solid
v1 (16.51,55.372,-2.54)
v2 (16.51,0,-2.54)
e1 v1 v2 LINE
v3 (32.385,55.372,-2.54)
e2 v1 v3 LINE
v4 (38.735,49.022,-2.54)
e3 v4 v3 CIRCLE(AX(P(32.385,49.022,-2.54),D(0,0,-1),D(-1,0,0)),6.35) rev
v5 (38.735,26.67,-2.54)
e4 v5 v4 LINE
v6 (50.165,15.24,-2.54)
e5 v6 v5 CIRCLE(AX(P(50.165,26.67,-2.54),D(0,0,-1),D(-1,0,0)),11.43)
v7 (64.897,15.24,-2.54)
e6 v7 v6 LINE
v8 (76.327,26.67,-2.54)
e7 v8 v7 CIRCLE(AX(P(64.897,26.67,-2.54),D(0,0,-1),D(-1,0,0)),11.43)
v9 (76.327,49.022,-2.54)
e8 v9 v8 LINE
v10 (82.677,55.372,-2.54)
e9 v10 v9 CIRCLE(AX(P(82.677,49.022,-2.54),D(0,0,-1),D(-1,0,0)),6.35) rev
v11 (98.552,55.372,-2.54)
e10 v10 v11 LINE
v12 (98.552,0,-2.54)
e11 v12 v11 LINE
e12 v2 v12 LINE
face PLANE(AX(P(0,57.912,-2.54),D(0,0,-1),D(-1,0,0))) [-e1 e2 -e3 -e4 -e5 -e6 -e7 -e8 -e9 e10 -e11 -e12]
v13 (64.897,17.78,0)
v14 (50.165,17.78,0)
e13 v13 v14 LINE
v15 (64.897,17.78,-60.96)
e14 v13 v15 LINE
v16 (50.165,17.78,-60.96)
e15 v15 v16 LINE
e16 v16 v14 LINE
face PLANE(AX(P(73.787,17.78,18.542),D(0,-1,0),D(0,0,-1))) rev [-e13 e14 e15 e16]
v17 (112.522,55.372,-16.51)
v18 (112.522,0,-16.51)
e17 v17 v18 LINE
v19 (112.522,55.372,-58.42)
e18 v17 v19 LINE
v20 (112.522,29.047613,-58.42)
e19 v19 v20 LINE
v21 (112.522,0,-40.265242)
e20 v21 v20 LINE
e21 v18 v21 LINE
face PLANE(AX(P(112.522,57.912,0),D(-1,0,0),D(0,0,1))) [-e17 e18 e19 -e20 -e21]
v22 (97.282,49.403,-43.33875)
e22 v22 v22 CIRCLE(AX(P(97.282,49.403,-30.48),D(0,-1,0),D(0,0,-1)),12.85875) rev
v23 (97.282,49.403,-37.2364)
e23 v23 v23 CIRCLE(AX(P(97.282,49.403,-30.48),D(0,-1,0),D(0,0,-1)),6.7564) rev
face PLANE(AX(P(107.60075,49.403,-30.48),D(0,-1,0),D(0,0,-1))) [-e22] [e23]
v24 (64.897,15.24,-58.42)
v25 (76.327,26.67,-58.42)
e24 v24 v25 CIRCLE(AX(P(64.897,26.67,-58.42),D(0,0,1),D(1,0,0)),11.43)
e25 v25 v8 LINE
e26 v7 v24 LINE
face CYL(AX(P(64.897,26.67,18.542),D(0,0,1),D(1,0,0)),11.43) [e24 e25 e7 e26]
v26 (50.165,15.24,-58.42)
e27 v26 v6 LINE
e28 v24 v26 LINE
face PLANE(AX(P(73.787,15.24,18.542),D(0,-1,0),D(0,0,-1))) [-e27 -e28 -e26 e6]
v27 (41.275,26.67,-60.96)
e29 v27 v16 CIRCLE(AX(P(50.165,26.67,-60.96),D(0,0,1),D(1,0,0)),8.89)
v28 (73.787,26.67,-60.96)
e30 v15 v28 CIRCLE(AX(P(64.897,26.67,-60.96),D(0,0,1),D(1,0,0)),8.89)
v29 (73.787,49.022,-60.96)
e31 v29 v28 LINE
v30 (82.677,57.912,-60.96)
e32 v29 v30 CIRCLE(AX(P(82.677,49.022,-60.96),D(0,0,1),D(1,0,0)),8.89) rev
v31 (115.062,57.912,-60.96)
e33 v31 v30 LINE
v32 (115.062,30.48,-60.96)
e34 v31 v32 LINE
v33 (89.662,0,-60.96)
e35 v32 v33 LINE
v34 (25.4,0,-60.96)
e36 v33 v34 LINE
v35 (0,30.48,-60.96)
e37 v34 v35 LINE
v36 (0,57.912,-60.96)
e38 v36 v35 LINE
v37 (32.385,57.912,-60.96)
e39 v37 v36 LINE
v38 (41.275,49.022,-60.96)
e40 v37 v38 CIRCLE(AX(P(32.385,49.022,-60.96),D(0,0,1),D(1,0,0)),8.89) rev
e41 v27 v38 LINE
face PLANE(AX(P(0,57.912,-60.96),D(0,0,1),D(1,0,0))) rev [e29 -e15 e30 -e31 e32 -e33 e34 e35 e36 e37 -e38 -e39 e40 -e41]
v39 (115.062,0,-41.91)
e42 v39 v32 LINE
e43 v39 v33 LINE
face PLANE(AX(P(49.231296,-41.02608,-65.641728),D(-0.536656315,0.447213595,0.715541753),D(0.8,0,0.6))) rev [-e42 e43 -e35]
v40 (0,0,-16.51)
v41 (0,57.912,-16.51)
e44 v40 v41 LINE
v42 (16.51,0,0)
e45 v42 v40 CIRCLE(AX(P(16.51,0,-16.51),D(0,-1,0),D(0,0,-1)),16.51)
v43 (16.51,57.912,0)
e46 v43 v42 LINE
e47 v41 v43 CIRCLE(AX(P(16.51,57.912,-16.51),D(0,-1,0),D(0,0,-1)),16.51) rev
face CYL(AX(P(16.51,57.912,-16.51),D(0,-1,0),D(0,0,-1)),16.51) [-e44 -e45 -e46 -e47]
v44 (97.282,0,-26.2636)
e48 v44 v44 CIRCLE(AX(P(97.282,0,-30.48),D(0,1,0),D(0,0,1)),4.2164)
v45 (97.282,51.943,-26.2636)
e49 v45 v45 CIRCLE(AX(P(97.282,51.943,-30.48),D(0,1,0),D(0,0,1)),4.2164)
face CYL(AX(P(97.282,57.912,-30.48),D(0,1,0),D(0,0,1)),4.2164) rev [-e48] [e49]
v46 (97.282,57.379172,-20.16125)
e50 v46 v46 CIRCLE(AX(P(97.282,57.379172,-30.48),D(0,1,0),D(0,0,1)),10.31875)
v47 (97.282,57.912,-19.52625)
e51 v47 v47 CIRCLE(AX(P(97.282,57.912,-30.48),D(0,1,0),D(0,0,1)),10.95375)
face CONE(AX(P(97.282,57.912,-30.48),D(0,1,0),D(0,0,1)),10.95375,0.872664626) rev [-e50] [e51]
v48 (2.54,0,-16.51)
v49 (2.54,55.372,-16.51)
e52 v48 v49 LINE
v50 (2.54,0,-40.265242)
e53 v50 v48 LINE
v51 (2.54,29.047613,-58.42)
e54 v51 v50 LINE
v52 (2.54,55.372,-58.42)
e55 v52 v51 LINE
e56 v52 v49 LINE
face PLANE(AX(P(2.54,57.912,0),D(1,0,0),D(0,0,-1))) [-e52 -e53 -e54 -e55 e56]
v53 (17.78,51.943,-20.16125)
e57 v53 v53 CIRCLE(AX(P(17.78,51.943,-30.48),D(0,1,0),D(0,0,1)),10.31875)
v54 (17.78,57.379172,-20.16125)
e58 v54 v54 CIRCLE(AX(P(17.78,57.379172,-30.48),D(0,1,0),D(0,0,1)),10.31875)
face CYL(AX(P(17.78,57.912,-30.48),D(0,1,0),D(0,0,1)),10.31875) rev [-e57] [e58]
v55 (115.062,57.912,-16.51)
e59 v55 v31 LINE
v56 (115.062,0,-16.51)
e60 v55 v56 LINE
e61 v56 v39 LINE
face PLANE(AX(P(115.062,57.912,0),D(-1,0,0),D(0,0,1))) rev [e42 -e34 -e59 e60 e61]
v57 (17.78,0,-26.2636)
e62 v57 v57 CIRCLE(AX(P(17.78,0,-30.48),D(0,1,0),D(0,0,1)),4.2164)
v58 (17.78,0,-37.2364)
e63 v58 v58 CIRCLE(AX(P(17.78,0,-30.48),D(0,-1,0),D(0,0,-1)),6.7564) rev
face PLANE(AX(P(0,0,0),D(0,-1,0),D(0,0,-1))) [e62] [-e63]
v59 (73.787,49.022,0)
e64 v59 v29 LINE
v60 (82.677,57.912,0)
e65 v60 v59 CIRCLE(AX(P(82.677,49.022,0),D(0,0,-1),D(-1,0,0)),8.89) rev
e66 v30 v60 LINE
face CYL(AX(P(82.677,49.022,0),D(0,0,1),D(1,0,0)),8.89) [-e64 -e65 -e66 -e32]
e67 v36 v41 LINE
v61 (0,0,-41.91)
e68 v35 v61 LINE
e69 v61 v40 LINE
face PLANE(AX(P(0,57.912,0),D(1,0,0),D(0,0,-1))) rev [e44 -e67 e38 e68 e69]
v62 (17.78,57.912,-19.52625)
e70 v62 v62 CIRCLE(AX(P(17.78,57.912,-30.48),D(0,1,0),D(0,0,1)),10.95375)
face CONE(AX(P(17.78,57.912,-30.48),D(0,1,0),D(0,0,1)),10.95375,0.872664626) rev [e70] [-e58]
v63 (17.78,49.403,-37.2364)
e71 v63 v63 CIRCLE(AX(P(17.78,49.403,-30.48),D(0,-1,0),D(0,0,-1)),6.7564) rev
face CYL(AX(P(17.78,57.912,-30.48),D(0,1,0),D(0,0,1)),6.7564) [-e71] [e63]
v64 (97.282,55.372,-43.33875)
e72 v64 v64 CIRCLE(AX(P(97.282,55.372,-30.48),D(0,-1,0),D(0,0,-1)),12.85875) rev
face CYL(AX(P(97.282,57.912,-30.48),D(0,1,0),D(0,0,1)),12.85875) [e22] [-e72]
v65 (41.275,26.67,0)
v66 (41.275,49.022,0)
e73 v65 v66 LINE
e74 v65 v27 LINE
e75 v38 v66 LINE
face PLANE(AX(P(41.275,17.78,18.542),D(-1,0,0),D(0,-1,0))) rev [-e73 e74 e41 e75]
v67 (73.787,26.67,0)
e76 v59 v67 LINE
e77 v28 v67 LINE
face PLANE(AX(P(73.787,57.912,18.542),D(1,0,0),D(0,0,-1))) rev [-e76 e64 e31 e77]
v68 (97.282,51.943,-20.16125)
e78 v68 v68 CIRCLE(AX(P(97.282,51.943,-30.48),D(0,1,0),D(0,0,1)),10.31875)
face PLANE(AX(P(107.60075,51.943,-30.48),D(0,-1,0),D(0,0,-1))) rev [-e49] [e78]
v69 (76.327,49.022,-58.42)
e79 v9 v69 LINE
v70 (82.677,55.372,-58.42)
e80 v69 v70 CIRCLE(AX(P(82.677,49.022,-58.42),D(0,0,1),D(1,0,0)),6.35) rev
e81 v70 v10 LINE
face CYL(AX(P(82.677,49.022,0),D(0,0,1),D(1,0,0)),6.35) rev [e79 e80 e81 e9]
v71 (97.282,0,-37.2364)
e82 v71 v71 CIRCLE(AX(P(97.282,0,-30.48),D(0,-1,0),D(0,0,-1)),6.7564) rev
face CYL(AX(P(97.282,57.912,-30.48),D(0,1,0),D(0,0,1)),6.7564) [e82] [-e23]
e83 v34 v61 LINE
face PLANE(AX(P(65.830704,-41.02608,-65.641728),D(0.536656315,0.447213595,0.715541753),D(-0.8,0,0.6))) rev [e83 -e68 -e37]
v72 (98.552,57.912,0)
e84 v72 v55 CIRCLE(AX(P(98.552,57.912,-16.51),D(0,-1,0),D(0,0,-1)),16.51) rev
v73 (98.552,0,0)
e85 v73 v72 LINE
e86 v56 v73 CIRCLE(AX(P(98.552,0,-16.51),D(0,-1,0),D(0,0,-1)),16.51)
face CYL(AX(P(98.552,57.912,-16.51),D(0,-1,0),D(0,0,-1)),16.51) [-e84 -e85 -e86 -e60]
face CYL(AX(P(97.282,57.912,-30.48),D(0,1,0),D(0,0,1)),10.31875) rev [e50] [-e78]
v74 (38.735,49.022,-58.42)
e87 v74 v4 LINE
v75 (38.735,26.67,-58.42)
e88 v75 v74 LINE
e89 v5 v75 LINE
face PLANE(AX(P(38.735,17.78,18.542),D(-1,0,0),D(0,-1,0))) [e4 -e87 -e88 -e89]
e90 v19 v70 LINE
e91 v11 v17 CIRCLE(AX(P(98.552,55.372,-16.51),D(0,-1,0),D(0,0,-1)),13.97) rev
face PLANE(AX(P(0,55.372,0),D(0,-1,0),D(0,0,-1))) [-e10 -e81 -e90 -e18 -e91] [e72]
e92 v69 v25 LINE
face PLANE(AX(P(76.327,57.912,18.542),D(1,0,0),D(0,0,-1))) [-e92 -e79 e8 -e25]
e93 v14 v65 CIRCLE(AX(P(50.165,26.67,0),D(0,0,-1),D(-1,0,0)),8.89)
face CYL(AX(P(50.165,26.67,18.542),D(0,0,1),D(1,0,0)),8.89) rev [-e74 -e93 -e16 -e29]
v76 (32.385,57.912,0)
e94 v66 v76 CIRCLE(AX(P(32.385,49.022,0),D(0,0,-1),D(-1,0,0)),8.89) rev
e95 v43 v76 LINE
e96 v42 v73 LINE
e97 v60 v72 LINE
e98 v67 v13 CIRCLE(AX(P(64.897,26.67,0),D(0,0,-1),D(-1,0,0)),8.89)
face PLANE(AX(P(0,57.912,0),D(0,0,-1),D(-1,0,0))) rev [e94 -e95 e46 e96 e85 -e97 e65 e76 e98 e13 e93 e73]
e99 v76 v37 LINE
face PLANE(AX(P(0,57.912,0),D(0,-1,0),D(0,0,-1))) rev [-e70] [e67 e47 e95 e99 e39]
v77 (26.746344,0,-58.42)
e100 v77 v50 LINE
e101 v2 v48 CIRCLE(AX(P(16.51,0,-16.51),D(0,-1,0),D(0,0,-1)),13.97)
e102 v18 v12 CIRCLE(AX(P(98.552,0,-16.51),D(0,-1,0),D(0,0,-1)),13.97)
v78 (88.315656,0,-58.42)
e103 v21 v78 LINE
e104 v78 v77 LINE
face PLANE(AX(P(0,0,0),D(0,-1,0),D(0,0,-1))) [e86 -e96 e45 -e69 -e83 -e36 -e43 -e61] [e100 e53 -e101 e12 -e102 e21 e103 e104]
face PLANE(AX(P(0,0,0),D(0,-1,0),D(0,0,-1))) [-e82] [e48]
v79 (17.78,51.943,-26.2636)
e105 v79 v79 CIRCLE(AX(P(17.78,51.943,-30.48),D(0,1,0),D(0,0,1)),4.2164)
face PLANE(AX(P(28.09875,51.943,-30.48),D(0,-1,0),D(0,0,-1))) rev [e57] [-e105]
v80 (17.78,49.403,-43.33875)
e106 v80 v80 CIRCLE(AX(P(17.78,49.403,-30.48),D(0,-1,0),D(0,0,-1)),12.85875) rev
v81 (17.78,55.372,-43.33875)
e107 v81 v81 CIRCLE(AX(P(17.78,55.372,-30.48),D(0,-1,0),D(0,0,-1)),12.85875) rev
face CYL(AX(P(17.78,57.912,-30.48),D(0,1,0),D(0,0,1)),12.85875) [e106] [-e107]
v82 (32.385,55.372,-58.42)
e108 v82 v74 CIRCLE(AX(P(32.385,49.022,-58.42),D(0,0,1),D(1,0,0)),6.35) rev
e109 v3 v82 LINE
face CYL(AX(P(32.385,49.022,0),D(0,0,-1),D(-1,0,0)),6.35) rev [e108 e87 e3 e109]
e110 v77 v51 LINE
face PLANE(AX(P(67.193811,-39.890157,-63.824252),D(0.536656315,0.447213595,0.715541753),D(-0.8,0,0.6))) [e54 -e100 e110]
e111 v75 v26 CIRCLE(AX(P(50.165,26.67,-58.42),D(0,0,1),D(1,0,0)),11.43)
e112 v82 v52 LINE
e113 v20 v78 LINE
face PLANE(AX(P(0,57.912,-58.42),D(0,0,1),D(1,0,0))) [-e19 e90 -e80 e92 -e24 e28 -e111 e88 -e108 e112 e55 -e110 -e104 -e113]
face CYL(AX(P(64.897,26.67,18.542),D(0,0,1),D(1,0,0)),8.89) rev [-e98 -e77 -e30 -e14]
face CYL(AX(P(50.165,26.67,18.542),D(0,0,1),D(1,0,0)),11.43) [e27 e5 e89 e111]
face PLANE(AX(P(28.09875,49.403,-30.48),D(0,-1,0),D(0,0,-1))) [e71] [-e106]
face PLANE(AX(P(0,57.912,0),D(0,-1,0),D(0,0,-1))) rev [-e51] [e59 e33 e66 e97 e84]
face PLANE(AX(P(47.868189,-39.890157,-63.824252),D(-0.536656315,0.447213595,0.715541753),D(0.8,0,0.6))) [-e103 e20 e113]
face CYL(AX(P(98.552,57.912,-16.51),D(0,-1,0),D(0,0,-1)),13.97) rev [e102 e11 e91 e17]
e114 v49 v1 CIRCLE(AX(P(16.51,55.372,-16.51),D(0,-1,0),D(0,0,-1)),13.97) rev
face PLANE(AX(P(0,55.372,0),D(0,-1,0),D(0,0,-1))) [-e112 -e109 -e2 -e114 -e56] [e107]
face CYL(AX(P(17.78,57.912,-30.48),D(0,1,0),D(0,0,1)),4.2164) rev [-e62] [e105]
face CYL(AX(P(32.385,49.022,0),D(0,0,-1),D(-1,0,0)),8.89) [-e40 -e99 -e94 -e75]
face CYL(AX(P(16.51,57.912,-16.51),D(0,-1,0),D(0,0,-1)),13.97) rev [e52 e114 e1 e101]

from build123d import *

# Parameters (mm, degrees)
SKETCH1_W                                = 115.062
SKETCH1_H                                = 60.96
BOSS_EXTRUDE1_DEPTH                      = 57.912
SKETCH3_W                                = 32.512
SKETCH3_H                                = 40.132
CUT_EXTRUDE1_DEPTH                       = 79.502
FILLET1_R                                = 16.51
FILLET2_R                                = 8.89
CBORE_FOR_5_16_HEX_HEAD_BOLT1_AT_2_COUNT = 2
CBORE_FOR_5_16_HEX_HEAD_BOLT1_AT_2_PITCH = 79.502
MIRROR1_START                            = -43.619425251
MIRROR1_OUTLINE_W                        = 33
MIRROR1_OUTLINE_H                        = 39
MIRROR1_DEPTH                            = 13.631070391
SHELL1_T                                 = -2.54


# Read off the part's stored shape, not the designer's step: Mirror1
with BuildPart() as part:
    # Sketch1 → Boss-Extrude1 (new body)
    with BuildSketch(Plane(origin=(0, 0, 0), x_dir=(1, 0, 0), z_dir=(0, 1, 0))):
        with Locations((57.531, 30.48)):
            Rectangle(SKETCH1_W, SKETCH1_H)
    extrude(amount=BOSS_EXTRUDE1_DEPTH)

    # Sketch3 → Cut-Extrude1 (cut)
    with BuildSketch(Plane(origin=(0, 0, -60.96), x_dir=(-1, 0, 0), z_dir=(0, 0, -1))):
        with Locations((-57.531, 37.846)):
            Rectangle(SKETCH3_W, SKETCH3_H)
    extrude(amount=-CUT_EXTRUDE1_DEPTH, mode=Mode.SUBTRACT)

    # Fillet1
    fillet1_edges = [part.edges().sort_by_distance(p)[0] for p in [
        (115.062, 28.956, 0),
        (0, 28.956, 0),
    ]]
    fillet(fillet1_edges, radius=FILLET1_R)

    # Fillet2
    fillet2_edges = [part.edges().sort_by_distance(p)[0] for p in [
        (73.787, 57.912, -30.48),
        (41.275, 57.912, -30.48),
        (41.275, 17.78, -30.48),
        (73.787, 17.78, -30.48),
    ]]
    fillet(fillet2_edges, radius=FILLET2_R)

    # Sketch5 → CBORE for 5/16 Hex Head Bolt1 (revolve, cut)
    with BuildSketch(Plane(origin=(17.78, 57.912, -30.48), x_dir=(0, 0, 1), z_dir=(1, 0, 0))):
        Polygon((0, 0), (0, 57.912), (4.2164, 57.912), (4.2164, 5.969), (10.31875, 5.969), (10.31875, 0.532828266), (10.95375, 0), align=None)
    cbore_for_5_16_hex_head_bolt1 = revolve(axis=Axis((17.78, 64.262, -30.48), (0, -1, 0)), mode=Mode.SUBTRACT)

    # CBORE for 5/16 Hex Head Bolt1 at 2: CBORE for 5/16 Hex Head Bolt1 ×2
    with Locations(*[(i * CBORE_FOR_5_16_HEX_HEAD_BOLT1_AT_2_PITCH, 0, 0) for i in range(1, CBORE_FOR_5_16_HEX_HEAD_BOLT1_AT_2_COUNT)]):
        add(cbore_for_5_16_hex_head_bolt1, mode=Mode.SUBTRACT)

    # SurfaceCut1
    split(bisect_by=Plane(origin=(49.231296, -41.02608, -65.641728), x_dir=(0.8438009243891594, 0.2844272778839867, 0.45508364461437806), z_dir=(-0.5366563145999497, 0.44721359549995837, 0.7155417527999325)), keep=Keep.TOP)

    # Mirror1 outline → Mirror1 (cut)
    with BuildSketch(Plane(origin=(0, 0, 0), x_dir=(0.8438009243891591, -0.284427277883987, -0.4550836446143786), z_dir=(0.5366563145999501, 0.4472135954999582, 0.7155417527999323)).offset(MIRROR1_START)):
        with Locations((34.5, 40.5)):
            Rectangle(MIRROR1_OUTLINE_W, MIRROR1_OUTLINE_H)
    extrude(amount=MIRROR1_DEPTH, mode=Mode.SUBTRACT)

    # Shell1
    shell1_openings = [part.faces().sort_by_distance(p)[0] for p in [
        (57.531, 0, -29.124585382),
    ]]
    offset(amount=SHELL1_T, openings=shell1_openings, kind=Kind.INTERSECTION)


solid = part.part
